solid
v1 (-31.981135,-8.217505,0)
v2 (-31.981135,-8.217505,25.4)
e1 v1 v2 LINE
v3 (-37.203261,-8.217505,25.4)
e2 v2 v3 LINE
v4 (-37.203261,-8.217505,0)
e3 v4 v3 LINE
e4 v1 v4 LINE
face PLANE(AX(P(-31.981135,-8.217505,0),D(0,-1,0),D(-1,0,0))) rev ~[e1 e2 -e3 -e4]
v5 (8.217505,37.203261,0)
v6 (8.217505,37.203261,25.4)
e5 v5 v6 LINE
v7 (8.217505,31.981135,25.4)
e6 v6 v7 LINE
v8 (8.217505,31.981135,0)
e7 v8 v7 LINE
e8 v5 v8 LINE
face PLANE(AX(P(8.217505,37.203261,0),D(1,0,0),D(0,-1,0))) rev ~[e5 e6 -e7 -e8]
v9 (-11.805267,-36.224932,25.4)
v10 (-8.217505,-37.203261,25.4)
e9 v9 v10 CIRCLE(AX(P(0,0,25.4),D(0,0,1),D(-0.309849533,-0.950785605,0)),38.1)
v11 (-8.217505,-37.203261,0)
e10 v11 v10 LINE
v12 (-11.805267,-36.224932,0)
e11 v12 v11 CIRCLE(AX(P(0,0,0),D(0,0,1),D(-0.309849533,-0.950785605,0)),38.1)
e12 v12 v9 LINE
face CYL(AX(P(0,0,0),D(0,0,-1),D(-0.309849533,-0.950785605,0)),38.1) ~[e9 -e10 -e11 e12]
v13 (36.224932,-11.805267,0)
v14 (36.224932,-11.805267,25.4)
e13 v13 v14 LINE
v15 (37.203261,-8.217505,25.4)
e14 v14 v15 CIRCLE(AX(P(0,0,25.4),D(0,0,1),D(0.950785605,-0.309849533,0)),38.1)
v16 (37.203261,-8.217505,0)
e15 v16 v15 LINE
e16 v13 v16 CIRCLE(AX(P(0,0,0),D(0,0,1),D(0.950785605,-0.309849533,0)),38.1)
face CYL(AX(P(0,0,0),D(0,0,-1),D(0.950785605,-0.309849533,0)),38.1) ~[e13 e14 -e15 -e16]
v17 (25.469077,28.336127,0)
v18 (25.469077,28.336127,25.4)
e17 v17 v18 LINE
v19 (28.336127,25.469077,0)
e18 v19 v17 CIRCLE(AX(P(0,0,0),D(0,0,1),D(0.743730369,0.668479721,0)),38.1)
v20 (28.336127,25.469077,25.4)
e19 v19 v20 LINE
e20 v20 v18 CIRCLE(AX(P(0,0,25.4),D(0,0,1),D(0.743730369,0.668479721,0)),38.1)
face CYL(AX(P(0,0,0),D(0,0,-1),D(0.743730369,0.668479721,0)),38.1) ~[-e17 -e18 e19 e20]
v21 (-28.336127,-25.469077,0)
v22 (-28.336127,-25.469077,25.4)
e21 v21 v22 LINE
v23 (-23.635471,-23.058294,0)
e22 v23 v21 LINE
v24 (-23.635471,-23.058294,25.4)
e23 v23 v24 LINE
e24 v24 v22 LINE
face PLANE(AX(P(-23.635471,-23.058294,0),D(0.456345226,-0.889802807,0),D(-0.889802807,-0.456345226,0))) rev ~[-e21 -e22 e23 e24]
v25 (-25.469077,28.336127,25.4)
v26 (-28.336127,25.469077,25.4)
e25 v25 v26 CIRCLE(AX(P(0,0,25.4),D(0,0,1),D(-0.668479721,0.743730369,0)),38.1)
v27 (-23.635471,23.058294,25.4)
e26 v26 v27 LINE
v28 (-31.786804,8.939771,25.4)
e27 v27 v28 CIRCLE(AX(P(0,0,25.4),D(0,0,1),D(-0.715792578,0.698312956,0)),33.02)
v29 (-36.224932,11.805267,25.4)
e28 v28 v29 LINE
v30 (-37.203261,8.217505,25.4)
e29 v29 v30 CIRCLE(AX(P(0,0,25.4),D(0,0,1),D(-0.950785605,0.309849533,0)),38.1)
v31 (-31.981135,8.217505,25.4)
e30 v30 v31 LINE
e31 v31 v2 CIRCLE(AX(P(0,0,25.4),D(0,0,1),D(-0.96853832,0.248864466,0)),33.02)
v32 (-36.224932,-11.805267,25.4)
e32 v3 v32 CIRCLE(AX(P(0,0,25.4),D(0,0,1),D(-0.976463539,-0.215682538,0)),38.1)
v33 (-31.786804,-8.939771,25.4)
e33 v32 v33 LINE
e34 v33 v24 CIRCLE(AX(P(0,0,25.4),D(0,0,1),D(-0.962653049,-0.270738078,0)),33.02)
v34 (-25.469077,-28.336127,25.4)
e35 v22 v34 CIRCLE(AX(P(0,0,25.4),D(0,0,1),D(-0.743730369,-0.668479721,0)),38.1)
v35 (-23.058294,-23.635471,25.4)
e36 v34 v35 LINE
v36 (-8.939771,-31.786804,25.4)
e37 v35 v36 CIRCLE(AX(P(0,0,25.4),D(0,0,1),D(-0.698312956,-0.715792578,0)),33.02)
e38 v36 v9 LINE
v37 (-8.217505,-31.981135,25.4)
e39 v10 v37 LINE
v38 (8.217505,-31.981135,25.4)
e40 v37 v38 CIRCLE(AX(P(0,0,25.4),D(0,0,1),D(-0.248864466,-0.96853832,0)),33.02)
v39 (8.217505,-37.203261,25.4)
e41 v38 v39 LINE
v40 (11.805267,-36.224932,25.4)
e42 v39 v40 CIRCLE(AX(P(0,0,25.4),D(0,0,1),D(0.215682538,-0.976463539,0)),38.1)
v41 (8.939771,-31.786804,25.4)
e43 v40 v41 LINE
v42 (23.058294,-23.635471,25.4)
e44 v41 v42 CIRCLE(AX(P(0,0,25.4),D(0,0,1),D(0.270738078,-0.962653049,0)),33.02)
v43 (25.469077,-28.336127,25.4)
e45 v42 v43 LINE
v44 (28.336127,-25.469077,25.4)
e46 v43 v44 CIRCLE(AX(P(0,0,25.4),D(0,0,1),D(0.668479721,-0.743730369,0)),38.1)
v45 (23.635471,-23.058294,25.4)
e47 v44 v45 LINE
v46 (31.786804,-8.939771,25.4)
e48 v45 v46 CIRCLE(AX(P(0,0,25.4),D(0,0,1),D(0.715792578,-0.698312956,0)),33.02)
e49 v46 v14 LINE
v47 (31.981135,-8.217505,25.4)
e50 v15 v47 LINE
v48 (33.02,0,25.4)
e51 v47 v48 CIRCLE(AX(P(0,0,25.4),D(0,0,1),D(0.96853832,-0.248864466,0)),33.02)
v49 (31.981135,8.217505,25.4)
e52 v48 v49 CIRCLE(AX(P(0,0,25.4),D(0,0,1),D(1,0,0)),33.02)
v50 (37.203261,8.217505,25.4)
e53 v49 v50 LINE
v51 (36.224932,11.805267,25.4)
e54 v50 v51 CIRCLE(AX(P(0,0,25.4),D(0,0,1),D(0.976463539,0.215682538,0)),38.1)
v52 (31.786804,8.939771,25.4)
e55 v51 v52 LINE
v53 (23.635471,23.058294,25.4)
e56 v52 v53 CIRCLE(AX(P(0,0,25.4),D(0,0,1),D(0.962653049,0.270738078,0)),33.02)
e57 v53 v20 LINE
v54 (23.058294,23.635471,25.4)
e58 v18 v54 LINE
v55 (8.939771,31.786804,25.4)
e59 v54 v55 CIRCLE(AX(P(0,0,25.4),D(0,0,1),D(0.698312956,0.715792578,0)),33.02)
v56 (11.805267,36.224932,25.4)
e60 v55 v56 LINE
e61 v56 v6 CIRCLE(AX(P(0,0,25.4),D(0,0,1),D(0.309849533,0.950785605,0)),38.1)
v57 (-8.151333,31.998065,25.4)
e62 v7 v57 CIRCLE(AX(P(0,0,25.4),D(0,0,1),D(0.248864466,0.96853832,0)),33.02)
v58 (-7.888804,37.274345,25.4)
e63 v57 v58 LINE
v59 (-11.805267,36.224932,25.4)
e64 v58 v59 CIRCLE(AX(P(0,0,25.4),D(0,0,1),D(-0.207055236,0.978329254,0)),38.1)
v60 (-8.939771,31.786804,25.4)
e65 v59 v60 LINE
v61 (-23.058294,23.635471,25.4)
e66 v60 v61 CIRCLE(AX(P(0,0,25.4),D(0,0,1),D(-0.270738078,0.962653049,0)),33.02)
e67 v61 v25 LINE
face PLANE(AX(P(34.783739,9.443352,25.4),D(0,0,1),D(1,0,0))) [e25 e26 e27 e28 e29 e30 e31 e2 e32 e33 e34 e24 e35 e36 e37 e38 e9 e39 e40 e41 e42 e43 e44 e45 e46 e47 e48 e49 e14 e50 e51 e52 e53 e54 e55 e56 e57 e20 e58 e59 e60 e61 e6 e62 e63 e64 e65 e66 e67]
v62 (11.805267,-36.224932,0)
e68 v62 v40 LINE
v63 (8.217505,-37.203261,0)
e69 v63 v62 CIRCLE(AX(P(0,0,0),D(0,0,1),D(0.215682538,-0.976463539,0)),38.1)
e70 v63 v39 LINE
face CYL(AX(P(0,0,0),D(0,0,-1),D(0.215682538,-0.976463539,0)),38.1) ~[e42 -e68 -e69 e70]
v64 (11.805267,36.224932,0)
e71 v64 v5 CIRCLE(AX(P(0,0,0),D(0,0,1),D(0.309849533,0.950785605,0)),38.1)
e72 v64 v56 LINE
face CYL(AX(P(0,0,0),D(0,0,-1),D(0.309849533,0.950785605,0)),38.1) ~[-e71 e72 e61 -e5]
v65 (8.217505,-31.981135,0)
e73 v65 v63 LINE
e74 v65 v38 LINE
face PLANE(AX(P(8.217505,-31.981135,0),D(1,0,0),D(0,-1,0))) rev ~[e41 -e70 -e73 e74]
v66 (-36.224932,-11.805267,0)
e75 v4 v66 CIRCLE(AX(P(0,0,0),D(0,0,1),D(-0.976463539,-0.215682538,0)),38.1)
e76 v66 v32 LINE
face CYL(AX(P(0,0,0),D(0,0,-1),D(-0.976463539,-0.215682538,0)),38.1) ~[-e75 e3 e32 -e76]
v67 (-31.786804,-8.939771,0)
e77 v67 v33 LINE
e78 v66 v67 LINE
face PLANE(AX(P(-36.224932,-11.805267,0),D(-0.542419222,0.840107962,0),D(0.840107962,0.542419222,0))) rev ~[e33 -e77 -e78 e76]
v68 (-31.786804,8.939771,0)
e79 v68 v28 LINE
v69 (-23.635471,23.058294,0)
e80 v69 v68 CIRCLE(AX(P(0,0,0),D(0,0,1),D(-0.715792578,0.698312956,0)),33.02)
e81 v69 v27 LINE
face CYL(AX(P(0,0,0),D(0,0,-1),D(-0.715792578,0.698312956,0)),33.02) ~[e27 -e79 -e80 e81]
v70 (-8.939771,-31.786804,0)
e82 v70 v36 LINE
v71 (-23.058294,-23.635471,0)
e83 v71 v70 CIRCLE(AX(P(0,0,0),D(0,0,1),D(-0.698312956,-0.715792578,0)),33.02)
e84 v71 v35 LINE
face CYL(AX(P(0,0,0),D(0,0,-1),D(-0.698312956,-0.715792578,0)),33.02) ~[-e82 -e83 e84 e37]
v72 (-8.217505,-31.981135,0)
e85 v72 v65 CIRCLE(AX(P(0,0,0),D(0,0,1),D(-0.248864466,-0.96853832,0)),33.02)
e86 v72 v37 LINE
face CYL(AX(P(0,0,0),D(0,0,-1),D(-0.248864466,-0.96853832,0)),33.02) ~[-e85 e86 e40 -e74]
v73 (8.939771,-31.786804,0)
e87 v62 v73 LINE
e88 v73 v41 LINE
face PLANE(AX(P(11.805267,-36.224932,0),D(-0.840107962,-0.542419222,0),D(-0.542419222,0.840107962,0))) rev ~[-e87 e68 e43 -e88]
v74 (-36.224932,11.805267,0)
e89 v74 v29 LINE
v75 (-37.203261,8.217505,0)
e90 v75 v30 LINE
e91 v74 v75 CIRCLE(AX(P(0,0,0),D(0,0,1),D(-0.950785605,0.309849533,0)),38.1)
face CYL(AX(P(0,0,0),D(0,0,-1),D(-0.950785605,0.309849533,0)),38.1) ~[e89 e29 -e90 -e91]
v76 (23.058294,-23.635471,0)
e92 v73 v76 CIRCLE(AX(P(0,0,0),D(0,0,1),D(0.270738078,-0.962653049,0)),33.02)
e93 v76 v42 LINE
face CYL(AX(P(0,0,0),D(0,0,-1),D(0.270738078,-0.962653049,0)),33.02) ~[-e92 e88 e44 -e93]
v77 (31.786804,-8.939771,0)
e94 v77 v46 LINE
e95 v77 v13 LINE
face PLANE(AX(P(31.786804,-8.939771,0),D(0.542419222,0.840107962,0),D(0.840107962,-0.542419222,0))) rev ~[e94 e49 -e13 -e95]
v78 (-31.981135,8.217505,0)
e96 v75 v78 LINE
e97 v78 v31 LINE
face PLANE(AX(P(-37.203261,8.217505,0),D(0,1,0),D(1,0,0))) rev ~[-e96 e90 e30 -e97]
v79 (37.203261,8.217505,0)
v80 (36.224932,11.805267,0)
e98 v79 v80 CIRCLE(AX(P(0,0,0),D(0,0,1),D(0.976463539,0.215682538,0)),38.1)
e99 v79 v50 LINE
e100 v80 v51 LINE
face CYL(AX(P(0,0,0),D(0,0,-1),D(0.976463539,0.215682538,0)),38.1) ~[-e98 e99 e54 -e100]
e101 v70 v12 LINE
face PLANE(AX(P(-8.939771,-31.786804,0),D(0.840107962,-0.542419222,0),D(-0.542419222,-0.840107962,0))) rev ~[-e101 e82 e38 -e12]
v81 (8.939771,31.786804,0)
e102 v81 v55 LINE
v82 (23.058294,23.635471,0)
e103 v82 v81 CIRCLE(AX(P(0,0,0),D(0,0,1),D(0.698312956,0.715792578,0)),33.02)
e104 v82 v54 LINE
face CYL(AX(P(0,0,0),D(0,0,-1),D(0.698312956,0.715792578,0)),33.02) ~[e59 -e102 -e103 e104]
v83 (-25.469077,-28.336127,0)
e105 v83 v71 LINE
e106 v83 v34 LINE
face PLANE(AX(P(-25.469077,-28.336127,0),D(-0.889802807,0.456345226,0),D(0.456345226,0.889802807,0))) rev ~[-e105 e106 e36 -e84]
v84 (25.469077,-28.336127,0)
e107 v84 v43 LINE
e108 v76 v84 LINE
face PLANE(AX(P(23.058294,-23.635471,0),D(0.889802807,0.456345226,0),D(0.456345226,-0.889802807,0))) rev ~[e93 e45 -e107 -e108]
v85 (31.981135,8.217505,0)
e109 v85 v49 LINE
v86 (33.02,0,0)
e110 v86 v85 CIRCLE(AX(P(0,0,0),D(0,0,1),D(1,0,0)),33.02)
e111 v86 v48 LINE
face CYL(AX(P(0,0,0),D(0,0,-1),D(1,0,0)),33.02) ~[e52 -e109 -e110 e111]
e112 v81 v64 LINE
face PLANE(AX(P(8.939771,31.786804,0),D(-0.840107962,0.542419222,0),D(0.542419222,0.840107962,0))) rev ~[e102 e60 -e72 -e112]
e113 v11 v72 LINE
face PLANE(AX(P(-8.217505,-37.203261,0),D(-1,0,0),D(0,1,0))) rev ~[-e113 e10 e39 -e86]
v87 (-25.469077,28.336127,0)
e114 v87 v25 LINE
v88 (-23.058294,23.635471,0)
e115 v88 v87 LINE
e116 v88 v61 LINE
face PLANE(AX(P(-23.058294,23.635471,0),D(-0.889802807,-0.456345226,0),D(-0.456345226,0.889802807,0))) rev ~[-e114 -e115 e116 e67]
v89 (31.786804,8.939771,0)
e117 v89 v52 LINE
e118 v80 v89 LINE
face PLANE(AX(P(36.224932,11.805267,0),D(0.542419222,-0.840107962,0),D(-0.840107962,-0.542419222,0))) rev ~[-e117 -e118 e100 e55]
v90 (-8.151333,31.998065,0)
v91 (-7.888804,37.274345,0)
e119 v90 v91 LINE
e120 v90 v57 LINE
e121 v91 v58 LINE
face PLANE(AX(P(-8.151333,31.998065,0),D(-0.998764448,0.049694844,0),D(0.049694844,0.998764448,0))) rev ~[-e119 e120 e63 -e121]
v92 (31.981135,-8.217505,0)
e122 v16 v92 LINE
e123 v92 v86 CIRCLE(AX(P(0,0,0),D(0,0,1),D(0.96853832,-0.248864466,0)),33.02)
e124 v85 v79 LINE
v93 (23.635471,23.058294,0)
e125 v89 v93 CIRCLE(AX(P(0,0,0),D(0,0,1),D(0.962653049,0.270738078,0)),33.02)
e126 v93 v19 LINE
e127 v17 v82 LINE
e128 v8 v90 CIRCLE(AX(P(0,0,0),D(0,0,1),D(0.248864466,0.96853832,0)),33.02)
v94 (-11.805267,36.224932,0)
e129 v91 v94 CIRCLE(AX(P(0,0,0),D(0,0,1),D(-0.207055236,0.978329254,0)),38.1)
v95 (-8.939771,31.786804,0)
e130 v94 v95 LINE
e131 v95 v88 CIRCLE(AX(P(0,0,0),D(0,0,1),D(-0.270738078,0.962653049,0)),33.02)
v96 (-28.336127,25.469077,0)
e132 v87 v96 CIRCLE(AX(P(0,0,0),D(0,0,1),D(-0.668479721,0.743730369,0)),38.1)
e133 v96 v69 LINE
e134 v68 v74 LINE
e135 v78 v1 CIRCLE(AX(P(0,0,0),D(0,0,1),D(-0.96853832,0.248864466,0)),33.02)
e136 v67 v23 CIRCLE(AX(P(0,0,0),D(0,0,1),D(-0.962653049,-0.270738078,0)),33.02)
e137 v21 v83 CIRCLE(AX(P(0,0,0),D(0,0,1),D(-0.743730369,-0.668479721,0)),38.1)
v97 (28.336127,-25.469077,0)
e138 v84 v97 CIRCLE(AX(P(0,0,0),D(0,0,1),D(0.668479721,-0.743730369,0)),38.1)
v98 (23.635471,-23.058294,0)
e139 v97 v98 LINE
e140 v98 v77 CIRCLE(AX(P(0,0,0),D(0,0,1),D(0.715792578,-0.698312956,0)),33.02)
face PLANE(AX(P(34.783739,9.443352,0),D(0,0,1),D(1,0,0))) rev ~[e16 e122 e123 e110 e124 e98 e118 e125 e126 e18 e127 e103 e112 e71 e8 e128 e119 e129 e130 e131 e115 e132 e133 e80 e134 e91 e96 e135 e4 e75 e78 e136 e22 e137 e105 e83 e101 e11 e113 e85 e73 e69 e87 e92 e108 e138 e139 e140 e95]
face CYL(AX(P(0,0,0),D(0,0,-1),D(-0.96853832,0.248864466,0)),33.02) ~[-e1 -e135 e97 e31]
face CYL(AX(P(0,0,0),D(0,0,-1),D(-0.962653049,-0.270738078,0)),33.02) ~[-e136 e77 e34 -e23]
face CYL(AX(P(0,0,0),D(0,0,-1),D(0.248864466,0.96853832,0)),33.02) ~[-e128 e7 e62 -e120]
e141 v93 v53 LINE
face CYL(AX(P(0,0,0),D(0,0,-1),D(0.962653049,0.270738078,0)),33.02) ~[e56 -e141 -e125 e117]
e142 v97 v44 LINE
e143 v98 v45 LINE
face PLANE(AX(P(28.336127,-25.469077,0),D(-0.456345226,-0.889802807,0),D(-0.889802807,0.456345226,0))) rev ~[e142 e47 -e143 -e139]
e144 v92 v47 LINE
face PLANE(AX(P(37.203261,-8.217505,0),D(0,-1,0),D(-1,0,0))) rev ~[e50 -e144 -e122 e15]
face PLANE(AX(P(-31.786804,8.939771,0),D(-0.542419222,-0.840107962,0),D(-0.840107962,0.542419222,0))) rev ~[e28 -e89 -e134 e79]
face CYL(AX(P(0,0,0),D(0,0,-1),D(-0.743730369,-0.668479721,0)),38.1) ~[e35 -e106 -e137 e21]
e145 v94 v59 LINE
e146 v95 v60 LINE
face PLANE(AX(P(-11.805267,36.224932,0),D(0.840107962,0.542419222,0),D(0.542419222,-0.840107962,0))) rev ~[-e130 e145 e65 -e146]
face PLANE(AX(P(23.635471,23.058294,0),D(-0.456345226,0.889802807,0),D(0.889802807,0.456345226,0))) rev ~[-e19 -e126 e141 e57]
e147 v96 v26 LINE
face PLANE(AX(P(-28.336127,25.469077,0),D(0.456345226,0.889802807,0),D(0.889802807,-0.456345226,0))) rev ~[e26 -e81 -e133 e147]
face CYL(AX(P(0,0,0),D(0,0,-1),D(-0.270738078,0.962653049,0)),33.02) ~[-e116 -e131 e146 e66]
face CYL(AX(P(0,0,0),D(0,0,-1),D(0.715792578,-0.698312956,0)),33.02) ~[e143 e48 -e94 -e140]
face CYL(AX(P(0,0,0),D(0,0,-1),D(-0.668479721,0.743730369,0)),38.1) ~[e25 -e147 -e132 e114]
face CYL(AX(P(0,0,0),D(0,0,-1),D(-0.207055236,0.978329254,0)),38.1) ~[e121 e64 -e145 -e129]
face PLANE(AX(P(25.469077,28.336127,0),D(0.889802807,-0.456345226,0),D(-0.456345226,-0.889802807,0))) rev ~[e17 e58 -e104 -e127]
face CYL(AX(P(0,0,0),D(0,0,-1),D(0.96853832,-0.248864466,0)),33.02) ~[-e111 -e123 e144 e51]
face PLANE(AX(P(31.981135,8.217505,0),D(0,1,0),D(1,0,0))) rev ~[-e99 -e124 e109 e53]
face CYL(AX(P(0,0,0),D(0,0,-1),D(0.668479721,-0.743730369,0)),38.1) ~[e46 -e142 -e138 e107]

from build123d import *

# Parameters (mm, degrees)
F1_DEPTH = 25.4


# Not quite as in the source:
# - a feature names something its author has since deleted; it is built from what else it names


with BuildPart() as f1:
    # F0 (on Top) → F1 (new body)
    with BuildSketch(Plane.XY):
        with BuildLine():
            Line((31.981135327, 8.217504682), (37.2032608356, 8.217504682))
            ThreePointArc((37.2032608356, 8.217504682), (36.7578953368, 10.0233293076), (36.2249315604, 11.8052671906))
            Line((36.2249315604, 11.8052671906), (31.7868036802, 8.9397713505))
            ThreePointArc((31.7868036802, 8.9397713505), (31.8860146238, 8.5791882723), (31.981135327, 8.217504682))
        make_face()
        with BuildLine():
            ThreePointArc((36.2249315604, -11.8052671906), (36.7578953368, -10.0233293076), (37.2032608356, -8.217504682))
            Line((37.2032608356, -8.217504682), (31.981135327, -8.217504682))
            ThreePointArc((31.981135327, -8.217504682), (31.8860146238, -8.5791882723), (31.7868036802, -8.9397713505))
            Line((31.7868036802, -8.9397713505), (36.2249315604, -11.8052671906))
        make_face()
        with BuildLine():
            ThreePointArc((33.02, 0), (32.7592543299, 4.1414557527), (31.981135327, 8.217504682))
            Line((31.981135327, 8.217504682), (30.6681449847, 8.217504682))
            ThreePointArc((30.6681449847, 8.217504682), (31.4783743486, 4.144206603), (31.75, 0))
            ThreePointArc((31.75, 0), (31.4783743486, -4.144206603), (30.6681449847, -8.217504682))
            Line((30.6681449847, -8.217504682), (31.981135327, -8.217504682))
            ThreePointArc((31.981135327, -8.217504682), (32.7592543299, -4.1414557527), (33.02, 0))
        make_face()
        with BuildLine():
            Line((30.6681449847, 8.217504682), (31.981135327, 8.217504682))
            ThreePointArc((31.981135327, 8.217504682), (31.8860146238, 8.5791882723), (31.7868036802, 8.9397713505))
            Line((31.7868036802, 8.9397713505), (30.6681449847, 8.217504682))
        make_face()
        with BuildLine():
            ThreePointArc((31.7868036802, -8.9397713505), (31.8860146238, -8.5791882723), (31.981135327, -8.217504682))
            Line((31.981135327, -8.217504682), (30.6681449847, -8.217504682))
            Line((30.6681449847, -8.217504682), (31.7868036802, -8.9397713505))
        make_face()
        with BuildLine():
            Line((23.6354709336, 23.0582938169), (28.3361270657, 25.4690773864))
            ThreePointArc((28.3361270657, 25.4690773864), (26.9407683632, 26.9407683632), (25.4690773864, 28.3361270657))
            Line((25.4690773864, 28.3361270657), (23.0582938169, 23.6354709336))
            ThreePointArc((23.0582938169, 23.6354709336), (23.3486659148, 23.3486659148), (23.6354709336, 23.0582938169))
        make_face()
        with BuildLine():
            Line((30.6681449847, 8.217504682), (31.7868036802, 8.9397713505))
            ThreePointArc((31.7868036802, 8.9397713505), (28.596158833, 16.51), (23.6354709336, 23.0582938169))
            Line((23.6354709336, 23.0582938169), (22.4506403027, 22.4506403027))
            ThreePointArc((22.4506403027, 22.4506403027), (27.4963065702, 15.875), (30.6681449847, 8.217504682))
        make_face()
        with BuildLine():
            ThreePointArc((31.75, 0), (31.4783743486, 4.144206603), (30.6681449847, 8.217504682))
            ThreePointArc((30.6681449847, 8.217504682), (27.4963065702, 15.875), (22.4506403027, 22.4506403027))
            ThreePointArc((22.4506403027, 22.4506403027), (15.875, 27.4963065702), (8.217504682, 30.6681449847))
            ThreePointArc((8.217504682, 30.6681449847), (0, 31.75), (-8.217504682, 30.6681449847))
            ThreePointArc((-8.217504682, 30.6681449847), (-15.875, 27.4963065702), (-22.4506403027, 22.4506403027))
            ThreePointArc((-22.4506403027, 22.4506403027), (-27.4963065702, 15.875), (-30.6681449847, 8.217504682))
            ThreePointArc((-30.6681449847, 8.217504682), (-31.75, 0), (-30.6681449847, -8.217504682))
            ThreePointArc((-30.6681449847, -8.217504682), (-27.4963065702, -15.875), (-22.4506403027, -22.4506403027))
            ThreePointArc((-22.4506403027, -22.4506403027), (-15.875, -27.4963065702), (-8.217504682, -30.6681449847))
            ThreePointArc((-8.217504682, -30.6681449847), (0, -31.75), (8.217504682, -30.6681449847))
            ThreePointArc((8.217504682, -30.6681449847), (15.875, -27.4963065702), (22.4506403027, -22.4506403027))
            ThreePointArc((22.4506403027, -22.4506403027), (27.4963065702, -15.875), (30.6681449847, -8.217504682))
            ThreePointArc((30.6681449847, -8.217504682), (31.4783743486, -4.144206603), (31.75, 0))
        make_face()
        with BuildLine():
            ThreePointArc((25.4690773864, -28.3361270657), (26.9407683632, -26.9407683632), (28.3361270657, -25.4690773864))
            Line((28.3361270657, -25.4690773864), (23.6354709336, -23.0582938169))
            ThreePointArc((23.6354709336, -23.0582938169), (23.3486659148, -23.3486659148), (23.0582938169, -23.6354709336))
            Line((23.0582938169, -23.6354709336), (25.4690773864, -28.3361270657))
        make_face()
        with BuildLine():
            ThreePointArc((23.6354709336, -23.0582938169), (28.596158833, -16.51), (31.7868036802, -8.9397713505))
            Line((31.7868036802, -8.9397713505), (30.6681449847, -8.217504682))
            ThreePointArc((30.6681449847, -8.217504682), (27.4963065702, -15.875), (22.4506403027, -22.4506403027))
            Line((22.4506403027, -22.4506403027), (23.6354709336, -23.0582938169))
        make_face()
        with BuildLine():
            Line((22.4506403027, 22.4506403027), (23.6354709336, 23.0582938169))
            ThreePointArc((23.6354709336, 23.0582938169), (23.3486659148, 23.3486659148), (23.0582938169, 23.6354709336))
            Line((23.0582938169, 23.6354709336), (22.4506403027, 22.4506403027))
        make_face()
        with BuildLine():
            ThreePointArc((8.217504682, 30.6681449847), (15.875, 27.4963065702), (22.4506403027, 22.4506403027))
            Line((22.4506403027, 22.4506403027), (23.0582938169, 23.6354709336))
            ThreePointArc((23.0582938169, 23.6354709336), (16.51, 28.596158833), (8.9397713505, 31.7868036802))
            Line((8.9397713505, 31.7868036802), (8.217504682, 30.6681449847))
        make_face()
        with BuildLine():
            ThreePointArc((23.0582938169, -23.6354709336), (23.3486659148, -23.3486659148), (23.6354709336, -23.0582938169))
            Line((23.6354709336, -23.0582938169), (22.4506403027, -22.4506403027))
            Line((22.4506403027, -22.4506403027), (23.0582938169, -23.6354709336))
        make_face()
        with BuildLine():
            Line((23.0582938169, -23.6354709336), (22.4506403027, -22.4506403027))
            ThreePointArc((22.4506403027, -22.4506403027), (15.875, -27.4963065702), (8.217504682, -30.6681449847))
            Line((8.217504682, -30.6681449847), (8.9397713505, -31.7868036802))
            ThreePointArc((8.9397713505, -31.7868036802), (16.51, -28.596158833), (23.0582938169, -23.6354709336))
        make_face()
        with BuildLine():
            Line((8.9397713505, 31.7868036802), (11.8052671906, 36.2249315604))
            ThreePointArc((11.8052671906, 36.2249315604), (10.0233293076, 36.7578953368), (8.217504682, 37.2032608356))
            Line((8.217504682, 37.2032608356), (8.217504682, 31.981135327))
            ThreePointArc((8.217504682, 31.981135327), (8.5791882723, 31.8860146238), (8.9397713505, 31.7868036802))
        make_face()
        with BuildLine():
            Line((8.217504682, 31.981135327), (8.217504682, 30.6681449847))
            Line((8.217504682, 30.6681449847), (8.9397713505, 31.7868036802))
            ThreePointArc((8.9397713505, 31.7868036802), (8.5791882723, 31.8860146238), (8.217504682, 31.981135327))
        make_face()
        with BuildLine():
            ThreePointArc((-8.217504682, 30.6681449847), (0, 31.75), (8.217504682, 30.6681449847))
            Line((8.217504682, 30.6681449847), (8.217504682, 31.981135327))
            ThreePointArc((8.217504682, 31.981135327), (0.0341516637, 33.0199823389), (-8.1513327465, 31.9980651674))
            Line((-8.1513327465, 31.9980651674), (-8.217504682, 30.6681449847))
        make_face()
        with BuildLine():
            ThreePointArc((8.217504682, -37.2032608356), (10.0233293076, -36.7578953368), (11.8052671906, -36.2249315604))
            Line((11.8052671906, -36.2249315604), (8.9397713505, -31.7868036802))
            ThreePointArc((8.9397713505, -31.7868036802), (8.5791882723, -31.8860146238), (8.217504682, -31.981135327))
            Line((8.217504682, -31.981135327), (8.217504682, -37.2032608356))
        make_face()
        with BuildLine():
            Line((8.217504682, -31.981135327), (8.217504682, -30.6681449847))
            ThreePointArc((8.217504682, -30.6681449847), (0, -31.75), (-8.217504682, -30.6681449847))
            Line((-8.217504682, -30.6681449847), (-8.217504682, -31.981135327))
            ThreePointArc((-8.217504682, -31.981135327), (0, -33.02), (8.217504682, -31.981135327))
        make_face()
        with BuildLine():
            Line((8.9397713505, -31.7868036802), (8.217504682, -30.6681449847))
            Line((8.217504682, -30.6681449847), (8.217504682, -31.981135327))
            ThreePointArc((8.217504682, -31.981135327), (8.5791882723, -31.8860146238), (8.9397713505, -31.7868036802))
        make_face()
        with BuildLine():
            Line((-8.9397713505, 31.7868036802), (-8.217504682, 30.6681449847))
            Line((-8.217504682, 30.6681449847), (-8.1513327465, 31.9980651674))
            ThreePointArc((-8.1513327465, 31.9980651674), (-8.5462048693, 31.8948707841), (-8.9397713505, 31.7868036802))
        make_face()
        with BuildLine():
            ThreePointArc((-22.4506403027, 22.4506403027), (-15.875, 27.4963065702), (-8.217504682, 30.6681449847))
            Line((-8.217504682, 30.6681449847), (-8.9397713505, 31.7868036802))
            ThreePointArc((-8.9397713505, 31.7868036802), (-16.51, 28.596158833), (-23.0582938169, 23.6354709336))
            Line((-23.0582938169, 23.6354709336), (-22.4506403027, 22.4506403027))
        make_face()
        with BuildLine():
            Line((-8.9397713505, -31.7868036802), (-8.217504682, -30.6681449847))
            ThreePointArc((-8.217504682, -30.6681449847), (-15.875, -27.4963065702), (-22.4506403027, -22.4506403027))
            Line((-22.4506403027, -22.4506403027), (-23.0582938169, -23.6354709336))
            ThreePointArc((-23.0582938169, -23.6354709336), (-16.51, -28.596158833), (-8.9397713505, -31.7868036802))
        make_face()
        with BuildLine():
            Line((-8.217504682, -31.981135327), (-8.217504682, -30.6681449847))
            Line((-8.217504682, -30.6681449847), (-8.9397713505, -31.7868036802))
            ThreePointArc((-8.9397713505, -31.7868036802), (-8.5791882723, -31.8860146238), (-8.217504682, -31.981135327))
        make_face()
        with BuildLine():
            Line((-8.1513327465, 31.9980651674), (-7.8888044947, 37.274344577))
            ThreePointArc((-7.8888044947, 37.274344577), (-9.8610056184, 36.8017739816), (-11.8052671906, 36.2249315604))
            Line((-11.8052671906, 36.2249315604), (-8.9397713505, 31.7868036802))
            ThreePointArc((-8.9397713505, 31.7868036802), (-8.5462048693, 31.8948707841), (-8.1513327465, 31.9980651674))
        make_face()
        with BuildLine():
            Line((-23.6354709336, 23.0582938169), (-22.4506403027, 22.4506403027))
            Line((-22.4506403027, 22.4506403027), (-23.0582938169, 23.6354709336))
            ThreePointArc((-23.0582938169, 23.6354709336), (-23.3486659148, 23.3486659148), (-23.6354709336, 23.0582938169))
        make_face()
        with BuildLine():
            ThreePointArc((-30.6681449847, 8.217504682), (-27.4963065702, 15.875), (-22.4506403027, 22.4506403027))
            Line((-22.4506403027, 22.4506403027), (-23.6354709336, 23.0582938169))
            ThreePointArc((-23.6354709336, 23.0582938169), (-28.596158833, 16.51), (-31.7868036802, 8.9397713505))
            Line((-31.7868036802, 8.9397713505), (-30.6681449847, 8.217504682))
        make_face()
        with BuildLine():
            ThreePointArc((-11.8052671906, -36.2249315604), (-10.0233293076, -36.7578953368), (-8.217504682, -37.2032608356))
            Line((-8.217504682, -37.2032608356), (-8.217504682, -31.981135327))
            ThreePointArc((-8.217504682, -31.981135327), (-8.5791882723, -31.8860146238), (-8.9397713505, -31.7868036802))
            Line((-8.9397713505, -31.7868036802), (-11.8052671906, -36.2249315604))
        make_face()
        with BuildLine():
            Line((-23.6354709336, -23.0582938169), (-22.4506403027, -22.4506403027))
            ThreePointArc((-22.4506403027, -22.4506403027), (-27.4963065702, -15.875), (-30.6681449847, -8.217504682))
            Line((-30.6681449847, -8.217504682), (-31.7868036802, -8.9397713505))
            ThreePointArc((-31.7868036802, -8.9397713505), (-28.596158833, -16.51), (-23.6354709336, -23.0582938169))
        make_face()
        with BuildLine():
            Line((-23.0582938169, -23.6354709336), (-22.4506403027, -22.4506403027))
            Line((-22.4506403027, -22.4506403027), (-23.6354709336, -23.0582938169))
            ThreePointArc((-23.6354709336, -23.0582938169), (-23.3486659148, -23.3486659148), (-23.0582938169, -23.6354709336))
        make_face()
        with BuildLine():
            Line((-31.981135327, 8.217504682), (-30.6681449847, 8.217504682))
            Line((-30.6681449847, 8.217504682), (-31.7868036802, 8.9397713505))
            ThreePointArc((-31.7868036802, 8.9397713505), (-31.8860146238, 8.5791882723), (-31.981135327, 8.217504682))
        make_face()
        with BuildLine():
            ThreePointArc((-30.6681449847, -8.217504682), (-31.75, 0), (-30.6681449847, 8.217504682))
            Line((-30.6681449847, 8.217504682), (-31.981135327, 8.217504682))
            ThreePointArc((-31.981135327, 8.217504682), (-33.02, 0), (-31.981135327, -8.217504682))
            Line((-31.981135327, -8.217504682), (-30.6681449847, -8.217504682))
        make_face()
        with BuildLine():
            ThreePointArc((-23.6354709336, 23.0582938169), (-23.3486659148, 23.3486659148), (-23.0582938169, 23.6354709336))
            Line((-23.0582938169, 23.6354709336), (-25.4690773864, 28.3361270657))
            ThreePointArc((-25.4690773864, 28.3361270657), (-26.9407683632, 26.9407683632), (-28.3361270657, 25.4690773864))
            Line((-28.3361270657, 25.4690773864), (-23.6354709336, 23.0582938169))
        make_face()
        with BuildLine():
            Line((-31.7868036802, -8.9397713505), (-30.6681449847, -8.217504682))
            Line((-30.6681449847, -8.217504682), (-31.981135327, -8.217504682))
            ThreePointArc((-31.981135327, -8.217504682), (-31.8860146238, -8.5791882723), (-31.7868036802, -8.9397713505))
        make_face()
        with BuildLine():
            Line((-25.4690773864, -28.3361270657), (-23.0582938169, -23.6354709336))
            ThreePointArc((-23.0582938169, -23.6354709336), (-23.3486659148, -23.3486659148), (-23.6354709336, -23.0582938169))
            Line((-23.6354709336, -23.0582938169), (-28.3361270657, -25.4690773864))
            ThreePointArc((-28.3361270657, -25.4690773864), (-26.9407683632, -26.9407683632), (-25.4690773864, -28.3361270657))
        make_face()
        with BuildLine():
            ThreePointArc((-31.981135327, 8.217504682), (-31.8860146238, 8.5791882723), (-31.7868036802, 8.9397713505))
            Line((-31.7868036802, 8.9397713505), (-36.2249315604, 11.8052671906))
            ThreePointArc((-36.2249315604, 11.8052671906), (-36.7578953368, 10.0233293076), (-37.2032608356, 8.217504682))
            Line((-37.2032608356, 8.217504682), (-31.981135327, 8.217504682))
        make_face()
        with BuildLine():
            Line((-36.2249315604, -11.8052671906), (-31.7868036802, -8.9397713505))
            ThreePointArc((-31.7868036802, -8.9397713505), (-31.8860146238, -8.5791882723), (-31.981135327, -8.217504682))
            Line((-31.981135327, -8.217504682), (-37.2032608356, -8.217504682))
            ThreePointArc((-37.2032608356, -8.217504682), (-36.7578953368, -10.0233293076), (-36.2249315604, -11.8052671906))
        make_face()
    extrude(amount=F1_DEPTH)


solid = f1.part
